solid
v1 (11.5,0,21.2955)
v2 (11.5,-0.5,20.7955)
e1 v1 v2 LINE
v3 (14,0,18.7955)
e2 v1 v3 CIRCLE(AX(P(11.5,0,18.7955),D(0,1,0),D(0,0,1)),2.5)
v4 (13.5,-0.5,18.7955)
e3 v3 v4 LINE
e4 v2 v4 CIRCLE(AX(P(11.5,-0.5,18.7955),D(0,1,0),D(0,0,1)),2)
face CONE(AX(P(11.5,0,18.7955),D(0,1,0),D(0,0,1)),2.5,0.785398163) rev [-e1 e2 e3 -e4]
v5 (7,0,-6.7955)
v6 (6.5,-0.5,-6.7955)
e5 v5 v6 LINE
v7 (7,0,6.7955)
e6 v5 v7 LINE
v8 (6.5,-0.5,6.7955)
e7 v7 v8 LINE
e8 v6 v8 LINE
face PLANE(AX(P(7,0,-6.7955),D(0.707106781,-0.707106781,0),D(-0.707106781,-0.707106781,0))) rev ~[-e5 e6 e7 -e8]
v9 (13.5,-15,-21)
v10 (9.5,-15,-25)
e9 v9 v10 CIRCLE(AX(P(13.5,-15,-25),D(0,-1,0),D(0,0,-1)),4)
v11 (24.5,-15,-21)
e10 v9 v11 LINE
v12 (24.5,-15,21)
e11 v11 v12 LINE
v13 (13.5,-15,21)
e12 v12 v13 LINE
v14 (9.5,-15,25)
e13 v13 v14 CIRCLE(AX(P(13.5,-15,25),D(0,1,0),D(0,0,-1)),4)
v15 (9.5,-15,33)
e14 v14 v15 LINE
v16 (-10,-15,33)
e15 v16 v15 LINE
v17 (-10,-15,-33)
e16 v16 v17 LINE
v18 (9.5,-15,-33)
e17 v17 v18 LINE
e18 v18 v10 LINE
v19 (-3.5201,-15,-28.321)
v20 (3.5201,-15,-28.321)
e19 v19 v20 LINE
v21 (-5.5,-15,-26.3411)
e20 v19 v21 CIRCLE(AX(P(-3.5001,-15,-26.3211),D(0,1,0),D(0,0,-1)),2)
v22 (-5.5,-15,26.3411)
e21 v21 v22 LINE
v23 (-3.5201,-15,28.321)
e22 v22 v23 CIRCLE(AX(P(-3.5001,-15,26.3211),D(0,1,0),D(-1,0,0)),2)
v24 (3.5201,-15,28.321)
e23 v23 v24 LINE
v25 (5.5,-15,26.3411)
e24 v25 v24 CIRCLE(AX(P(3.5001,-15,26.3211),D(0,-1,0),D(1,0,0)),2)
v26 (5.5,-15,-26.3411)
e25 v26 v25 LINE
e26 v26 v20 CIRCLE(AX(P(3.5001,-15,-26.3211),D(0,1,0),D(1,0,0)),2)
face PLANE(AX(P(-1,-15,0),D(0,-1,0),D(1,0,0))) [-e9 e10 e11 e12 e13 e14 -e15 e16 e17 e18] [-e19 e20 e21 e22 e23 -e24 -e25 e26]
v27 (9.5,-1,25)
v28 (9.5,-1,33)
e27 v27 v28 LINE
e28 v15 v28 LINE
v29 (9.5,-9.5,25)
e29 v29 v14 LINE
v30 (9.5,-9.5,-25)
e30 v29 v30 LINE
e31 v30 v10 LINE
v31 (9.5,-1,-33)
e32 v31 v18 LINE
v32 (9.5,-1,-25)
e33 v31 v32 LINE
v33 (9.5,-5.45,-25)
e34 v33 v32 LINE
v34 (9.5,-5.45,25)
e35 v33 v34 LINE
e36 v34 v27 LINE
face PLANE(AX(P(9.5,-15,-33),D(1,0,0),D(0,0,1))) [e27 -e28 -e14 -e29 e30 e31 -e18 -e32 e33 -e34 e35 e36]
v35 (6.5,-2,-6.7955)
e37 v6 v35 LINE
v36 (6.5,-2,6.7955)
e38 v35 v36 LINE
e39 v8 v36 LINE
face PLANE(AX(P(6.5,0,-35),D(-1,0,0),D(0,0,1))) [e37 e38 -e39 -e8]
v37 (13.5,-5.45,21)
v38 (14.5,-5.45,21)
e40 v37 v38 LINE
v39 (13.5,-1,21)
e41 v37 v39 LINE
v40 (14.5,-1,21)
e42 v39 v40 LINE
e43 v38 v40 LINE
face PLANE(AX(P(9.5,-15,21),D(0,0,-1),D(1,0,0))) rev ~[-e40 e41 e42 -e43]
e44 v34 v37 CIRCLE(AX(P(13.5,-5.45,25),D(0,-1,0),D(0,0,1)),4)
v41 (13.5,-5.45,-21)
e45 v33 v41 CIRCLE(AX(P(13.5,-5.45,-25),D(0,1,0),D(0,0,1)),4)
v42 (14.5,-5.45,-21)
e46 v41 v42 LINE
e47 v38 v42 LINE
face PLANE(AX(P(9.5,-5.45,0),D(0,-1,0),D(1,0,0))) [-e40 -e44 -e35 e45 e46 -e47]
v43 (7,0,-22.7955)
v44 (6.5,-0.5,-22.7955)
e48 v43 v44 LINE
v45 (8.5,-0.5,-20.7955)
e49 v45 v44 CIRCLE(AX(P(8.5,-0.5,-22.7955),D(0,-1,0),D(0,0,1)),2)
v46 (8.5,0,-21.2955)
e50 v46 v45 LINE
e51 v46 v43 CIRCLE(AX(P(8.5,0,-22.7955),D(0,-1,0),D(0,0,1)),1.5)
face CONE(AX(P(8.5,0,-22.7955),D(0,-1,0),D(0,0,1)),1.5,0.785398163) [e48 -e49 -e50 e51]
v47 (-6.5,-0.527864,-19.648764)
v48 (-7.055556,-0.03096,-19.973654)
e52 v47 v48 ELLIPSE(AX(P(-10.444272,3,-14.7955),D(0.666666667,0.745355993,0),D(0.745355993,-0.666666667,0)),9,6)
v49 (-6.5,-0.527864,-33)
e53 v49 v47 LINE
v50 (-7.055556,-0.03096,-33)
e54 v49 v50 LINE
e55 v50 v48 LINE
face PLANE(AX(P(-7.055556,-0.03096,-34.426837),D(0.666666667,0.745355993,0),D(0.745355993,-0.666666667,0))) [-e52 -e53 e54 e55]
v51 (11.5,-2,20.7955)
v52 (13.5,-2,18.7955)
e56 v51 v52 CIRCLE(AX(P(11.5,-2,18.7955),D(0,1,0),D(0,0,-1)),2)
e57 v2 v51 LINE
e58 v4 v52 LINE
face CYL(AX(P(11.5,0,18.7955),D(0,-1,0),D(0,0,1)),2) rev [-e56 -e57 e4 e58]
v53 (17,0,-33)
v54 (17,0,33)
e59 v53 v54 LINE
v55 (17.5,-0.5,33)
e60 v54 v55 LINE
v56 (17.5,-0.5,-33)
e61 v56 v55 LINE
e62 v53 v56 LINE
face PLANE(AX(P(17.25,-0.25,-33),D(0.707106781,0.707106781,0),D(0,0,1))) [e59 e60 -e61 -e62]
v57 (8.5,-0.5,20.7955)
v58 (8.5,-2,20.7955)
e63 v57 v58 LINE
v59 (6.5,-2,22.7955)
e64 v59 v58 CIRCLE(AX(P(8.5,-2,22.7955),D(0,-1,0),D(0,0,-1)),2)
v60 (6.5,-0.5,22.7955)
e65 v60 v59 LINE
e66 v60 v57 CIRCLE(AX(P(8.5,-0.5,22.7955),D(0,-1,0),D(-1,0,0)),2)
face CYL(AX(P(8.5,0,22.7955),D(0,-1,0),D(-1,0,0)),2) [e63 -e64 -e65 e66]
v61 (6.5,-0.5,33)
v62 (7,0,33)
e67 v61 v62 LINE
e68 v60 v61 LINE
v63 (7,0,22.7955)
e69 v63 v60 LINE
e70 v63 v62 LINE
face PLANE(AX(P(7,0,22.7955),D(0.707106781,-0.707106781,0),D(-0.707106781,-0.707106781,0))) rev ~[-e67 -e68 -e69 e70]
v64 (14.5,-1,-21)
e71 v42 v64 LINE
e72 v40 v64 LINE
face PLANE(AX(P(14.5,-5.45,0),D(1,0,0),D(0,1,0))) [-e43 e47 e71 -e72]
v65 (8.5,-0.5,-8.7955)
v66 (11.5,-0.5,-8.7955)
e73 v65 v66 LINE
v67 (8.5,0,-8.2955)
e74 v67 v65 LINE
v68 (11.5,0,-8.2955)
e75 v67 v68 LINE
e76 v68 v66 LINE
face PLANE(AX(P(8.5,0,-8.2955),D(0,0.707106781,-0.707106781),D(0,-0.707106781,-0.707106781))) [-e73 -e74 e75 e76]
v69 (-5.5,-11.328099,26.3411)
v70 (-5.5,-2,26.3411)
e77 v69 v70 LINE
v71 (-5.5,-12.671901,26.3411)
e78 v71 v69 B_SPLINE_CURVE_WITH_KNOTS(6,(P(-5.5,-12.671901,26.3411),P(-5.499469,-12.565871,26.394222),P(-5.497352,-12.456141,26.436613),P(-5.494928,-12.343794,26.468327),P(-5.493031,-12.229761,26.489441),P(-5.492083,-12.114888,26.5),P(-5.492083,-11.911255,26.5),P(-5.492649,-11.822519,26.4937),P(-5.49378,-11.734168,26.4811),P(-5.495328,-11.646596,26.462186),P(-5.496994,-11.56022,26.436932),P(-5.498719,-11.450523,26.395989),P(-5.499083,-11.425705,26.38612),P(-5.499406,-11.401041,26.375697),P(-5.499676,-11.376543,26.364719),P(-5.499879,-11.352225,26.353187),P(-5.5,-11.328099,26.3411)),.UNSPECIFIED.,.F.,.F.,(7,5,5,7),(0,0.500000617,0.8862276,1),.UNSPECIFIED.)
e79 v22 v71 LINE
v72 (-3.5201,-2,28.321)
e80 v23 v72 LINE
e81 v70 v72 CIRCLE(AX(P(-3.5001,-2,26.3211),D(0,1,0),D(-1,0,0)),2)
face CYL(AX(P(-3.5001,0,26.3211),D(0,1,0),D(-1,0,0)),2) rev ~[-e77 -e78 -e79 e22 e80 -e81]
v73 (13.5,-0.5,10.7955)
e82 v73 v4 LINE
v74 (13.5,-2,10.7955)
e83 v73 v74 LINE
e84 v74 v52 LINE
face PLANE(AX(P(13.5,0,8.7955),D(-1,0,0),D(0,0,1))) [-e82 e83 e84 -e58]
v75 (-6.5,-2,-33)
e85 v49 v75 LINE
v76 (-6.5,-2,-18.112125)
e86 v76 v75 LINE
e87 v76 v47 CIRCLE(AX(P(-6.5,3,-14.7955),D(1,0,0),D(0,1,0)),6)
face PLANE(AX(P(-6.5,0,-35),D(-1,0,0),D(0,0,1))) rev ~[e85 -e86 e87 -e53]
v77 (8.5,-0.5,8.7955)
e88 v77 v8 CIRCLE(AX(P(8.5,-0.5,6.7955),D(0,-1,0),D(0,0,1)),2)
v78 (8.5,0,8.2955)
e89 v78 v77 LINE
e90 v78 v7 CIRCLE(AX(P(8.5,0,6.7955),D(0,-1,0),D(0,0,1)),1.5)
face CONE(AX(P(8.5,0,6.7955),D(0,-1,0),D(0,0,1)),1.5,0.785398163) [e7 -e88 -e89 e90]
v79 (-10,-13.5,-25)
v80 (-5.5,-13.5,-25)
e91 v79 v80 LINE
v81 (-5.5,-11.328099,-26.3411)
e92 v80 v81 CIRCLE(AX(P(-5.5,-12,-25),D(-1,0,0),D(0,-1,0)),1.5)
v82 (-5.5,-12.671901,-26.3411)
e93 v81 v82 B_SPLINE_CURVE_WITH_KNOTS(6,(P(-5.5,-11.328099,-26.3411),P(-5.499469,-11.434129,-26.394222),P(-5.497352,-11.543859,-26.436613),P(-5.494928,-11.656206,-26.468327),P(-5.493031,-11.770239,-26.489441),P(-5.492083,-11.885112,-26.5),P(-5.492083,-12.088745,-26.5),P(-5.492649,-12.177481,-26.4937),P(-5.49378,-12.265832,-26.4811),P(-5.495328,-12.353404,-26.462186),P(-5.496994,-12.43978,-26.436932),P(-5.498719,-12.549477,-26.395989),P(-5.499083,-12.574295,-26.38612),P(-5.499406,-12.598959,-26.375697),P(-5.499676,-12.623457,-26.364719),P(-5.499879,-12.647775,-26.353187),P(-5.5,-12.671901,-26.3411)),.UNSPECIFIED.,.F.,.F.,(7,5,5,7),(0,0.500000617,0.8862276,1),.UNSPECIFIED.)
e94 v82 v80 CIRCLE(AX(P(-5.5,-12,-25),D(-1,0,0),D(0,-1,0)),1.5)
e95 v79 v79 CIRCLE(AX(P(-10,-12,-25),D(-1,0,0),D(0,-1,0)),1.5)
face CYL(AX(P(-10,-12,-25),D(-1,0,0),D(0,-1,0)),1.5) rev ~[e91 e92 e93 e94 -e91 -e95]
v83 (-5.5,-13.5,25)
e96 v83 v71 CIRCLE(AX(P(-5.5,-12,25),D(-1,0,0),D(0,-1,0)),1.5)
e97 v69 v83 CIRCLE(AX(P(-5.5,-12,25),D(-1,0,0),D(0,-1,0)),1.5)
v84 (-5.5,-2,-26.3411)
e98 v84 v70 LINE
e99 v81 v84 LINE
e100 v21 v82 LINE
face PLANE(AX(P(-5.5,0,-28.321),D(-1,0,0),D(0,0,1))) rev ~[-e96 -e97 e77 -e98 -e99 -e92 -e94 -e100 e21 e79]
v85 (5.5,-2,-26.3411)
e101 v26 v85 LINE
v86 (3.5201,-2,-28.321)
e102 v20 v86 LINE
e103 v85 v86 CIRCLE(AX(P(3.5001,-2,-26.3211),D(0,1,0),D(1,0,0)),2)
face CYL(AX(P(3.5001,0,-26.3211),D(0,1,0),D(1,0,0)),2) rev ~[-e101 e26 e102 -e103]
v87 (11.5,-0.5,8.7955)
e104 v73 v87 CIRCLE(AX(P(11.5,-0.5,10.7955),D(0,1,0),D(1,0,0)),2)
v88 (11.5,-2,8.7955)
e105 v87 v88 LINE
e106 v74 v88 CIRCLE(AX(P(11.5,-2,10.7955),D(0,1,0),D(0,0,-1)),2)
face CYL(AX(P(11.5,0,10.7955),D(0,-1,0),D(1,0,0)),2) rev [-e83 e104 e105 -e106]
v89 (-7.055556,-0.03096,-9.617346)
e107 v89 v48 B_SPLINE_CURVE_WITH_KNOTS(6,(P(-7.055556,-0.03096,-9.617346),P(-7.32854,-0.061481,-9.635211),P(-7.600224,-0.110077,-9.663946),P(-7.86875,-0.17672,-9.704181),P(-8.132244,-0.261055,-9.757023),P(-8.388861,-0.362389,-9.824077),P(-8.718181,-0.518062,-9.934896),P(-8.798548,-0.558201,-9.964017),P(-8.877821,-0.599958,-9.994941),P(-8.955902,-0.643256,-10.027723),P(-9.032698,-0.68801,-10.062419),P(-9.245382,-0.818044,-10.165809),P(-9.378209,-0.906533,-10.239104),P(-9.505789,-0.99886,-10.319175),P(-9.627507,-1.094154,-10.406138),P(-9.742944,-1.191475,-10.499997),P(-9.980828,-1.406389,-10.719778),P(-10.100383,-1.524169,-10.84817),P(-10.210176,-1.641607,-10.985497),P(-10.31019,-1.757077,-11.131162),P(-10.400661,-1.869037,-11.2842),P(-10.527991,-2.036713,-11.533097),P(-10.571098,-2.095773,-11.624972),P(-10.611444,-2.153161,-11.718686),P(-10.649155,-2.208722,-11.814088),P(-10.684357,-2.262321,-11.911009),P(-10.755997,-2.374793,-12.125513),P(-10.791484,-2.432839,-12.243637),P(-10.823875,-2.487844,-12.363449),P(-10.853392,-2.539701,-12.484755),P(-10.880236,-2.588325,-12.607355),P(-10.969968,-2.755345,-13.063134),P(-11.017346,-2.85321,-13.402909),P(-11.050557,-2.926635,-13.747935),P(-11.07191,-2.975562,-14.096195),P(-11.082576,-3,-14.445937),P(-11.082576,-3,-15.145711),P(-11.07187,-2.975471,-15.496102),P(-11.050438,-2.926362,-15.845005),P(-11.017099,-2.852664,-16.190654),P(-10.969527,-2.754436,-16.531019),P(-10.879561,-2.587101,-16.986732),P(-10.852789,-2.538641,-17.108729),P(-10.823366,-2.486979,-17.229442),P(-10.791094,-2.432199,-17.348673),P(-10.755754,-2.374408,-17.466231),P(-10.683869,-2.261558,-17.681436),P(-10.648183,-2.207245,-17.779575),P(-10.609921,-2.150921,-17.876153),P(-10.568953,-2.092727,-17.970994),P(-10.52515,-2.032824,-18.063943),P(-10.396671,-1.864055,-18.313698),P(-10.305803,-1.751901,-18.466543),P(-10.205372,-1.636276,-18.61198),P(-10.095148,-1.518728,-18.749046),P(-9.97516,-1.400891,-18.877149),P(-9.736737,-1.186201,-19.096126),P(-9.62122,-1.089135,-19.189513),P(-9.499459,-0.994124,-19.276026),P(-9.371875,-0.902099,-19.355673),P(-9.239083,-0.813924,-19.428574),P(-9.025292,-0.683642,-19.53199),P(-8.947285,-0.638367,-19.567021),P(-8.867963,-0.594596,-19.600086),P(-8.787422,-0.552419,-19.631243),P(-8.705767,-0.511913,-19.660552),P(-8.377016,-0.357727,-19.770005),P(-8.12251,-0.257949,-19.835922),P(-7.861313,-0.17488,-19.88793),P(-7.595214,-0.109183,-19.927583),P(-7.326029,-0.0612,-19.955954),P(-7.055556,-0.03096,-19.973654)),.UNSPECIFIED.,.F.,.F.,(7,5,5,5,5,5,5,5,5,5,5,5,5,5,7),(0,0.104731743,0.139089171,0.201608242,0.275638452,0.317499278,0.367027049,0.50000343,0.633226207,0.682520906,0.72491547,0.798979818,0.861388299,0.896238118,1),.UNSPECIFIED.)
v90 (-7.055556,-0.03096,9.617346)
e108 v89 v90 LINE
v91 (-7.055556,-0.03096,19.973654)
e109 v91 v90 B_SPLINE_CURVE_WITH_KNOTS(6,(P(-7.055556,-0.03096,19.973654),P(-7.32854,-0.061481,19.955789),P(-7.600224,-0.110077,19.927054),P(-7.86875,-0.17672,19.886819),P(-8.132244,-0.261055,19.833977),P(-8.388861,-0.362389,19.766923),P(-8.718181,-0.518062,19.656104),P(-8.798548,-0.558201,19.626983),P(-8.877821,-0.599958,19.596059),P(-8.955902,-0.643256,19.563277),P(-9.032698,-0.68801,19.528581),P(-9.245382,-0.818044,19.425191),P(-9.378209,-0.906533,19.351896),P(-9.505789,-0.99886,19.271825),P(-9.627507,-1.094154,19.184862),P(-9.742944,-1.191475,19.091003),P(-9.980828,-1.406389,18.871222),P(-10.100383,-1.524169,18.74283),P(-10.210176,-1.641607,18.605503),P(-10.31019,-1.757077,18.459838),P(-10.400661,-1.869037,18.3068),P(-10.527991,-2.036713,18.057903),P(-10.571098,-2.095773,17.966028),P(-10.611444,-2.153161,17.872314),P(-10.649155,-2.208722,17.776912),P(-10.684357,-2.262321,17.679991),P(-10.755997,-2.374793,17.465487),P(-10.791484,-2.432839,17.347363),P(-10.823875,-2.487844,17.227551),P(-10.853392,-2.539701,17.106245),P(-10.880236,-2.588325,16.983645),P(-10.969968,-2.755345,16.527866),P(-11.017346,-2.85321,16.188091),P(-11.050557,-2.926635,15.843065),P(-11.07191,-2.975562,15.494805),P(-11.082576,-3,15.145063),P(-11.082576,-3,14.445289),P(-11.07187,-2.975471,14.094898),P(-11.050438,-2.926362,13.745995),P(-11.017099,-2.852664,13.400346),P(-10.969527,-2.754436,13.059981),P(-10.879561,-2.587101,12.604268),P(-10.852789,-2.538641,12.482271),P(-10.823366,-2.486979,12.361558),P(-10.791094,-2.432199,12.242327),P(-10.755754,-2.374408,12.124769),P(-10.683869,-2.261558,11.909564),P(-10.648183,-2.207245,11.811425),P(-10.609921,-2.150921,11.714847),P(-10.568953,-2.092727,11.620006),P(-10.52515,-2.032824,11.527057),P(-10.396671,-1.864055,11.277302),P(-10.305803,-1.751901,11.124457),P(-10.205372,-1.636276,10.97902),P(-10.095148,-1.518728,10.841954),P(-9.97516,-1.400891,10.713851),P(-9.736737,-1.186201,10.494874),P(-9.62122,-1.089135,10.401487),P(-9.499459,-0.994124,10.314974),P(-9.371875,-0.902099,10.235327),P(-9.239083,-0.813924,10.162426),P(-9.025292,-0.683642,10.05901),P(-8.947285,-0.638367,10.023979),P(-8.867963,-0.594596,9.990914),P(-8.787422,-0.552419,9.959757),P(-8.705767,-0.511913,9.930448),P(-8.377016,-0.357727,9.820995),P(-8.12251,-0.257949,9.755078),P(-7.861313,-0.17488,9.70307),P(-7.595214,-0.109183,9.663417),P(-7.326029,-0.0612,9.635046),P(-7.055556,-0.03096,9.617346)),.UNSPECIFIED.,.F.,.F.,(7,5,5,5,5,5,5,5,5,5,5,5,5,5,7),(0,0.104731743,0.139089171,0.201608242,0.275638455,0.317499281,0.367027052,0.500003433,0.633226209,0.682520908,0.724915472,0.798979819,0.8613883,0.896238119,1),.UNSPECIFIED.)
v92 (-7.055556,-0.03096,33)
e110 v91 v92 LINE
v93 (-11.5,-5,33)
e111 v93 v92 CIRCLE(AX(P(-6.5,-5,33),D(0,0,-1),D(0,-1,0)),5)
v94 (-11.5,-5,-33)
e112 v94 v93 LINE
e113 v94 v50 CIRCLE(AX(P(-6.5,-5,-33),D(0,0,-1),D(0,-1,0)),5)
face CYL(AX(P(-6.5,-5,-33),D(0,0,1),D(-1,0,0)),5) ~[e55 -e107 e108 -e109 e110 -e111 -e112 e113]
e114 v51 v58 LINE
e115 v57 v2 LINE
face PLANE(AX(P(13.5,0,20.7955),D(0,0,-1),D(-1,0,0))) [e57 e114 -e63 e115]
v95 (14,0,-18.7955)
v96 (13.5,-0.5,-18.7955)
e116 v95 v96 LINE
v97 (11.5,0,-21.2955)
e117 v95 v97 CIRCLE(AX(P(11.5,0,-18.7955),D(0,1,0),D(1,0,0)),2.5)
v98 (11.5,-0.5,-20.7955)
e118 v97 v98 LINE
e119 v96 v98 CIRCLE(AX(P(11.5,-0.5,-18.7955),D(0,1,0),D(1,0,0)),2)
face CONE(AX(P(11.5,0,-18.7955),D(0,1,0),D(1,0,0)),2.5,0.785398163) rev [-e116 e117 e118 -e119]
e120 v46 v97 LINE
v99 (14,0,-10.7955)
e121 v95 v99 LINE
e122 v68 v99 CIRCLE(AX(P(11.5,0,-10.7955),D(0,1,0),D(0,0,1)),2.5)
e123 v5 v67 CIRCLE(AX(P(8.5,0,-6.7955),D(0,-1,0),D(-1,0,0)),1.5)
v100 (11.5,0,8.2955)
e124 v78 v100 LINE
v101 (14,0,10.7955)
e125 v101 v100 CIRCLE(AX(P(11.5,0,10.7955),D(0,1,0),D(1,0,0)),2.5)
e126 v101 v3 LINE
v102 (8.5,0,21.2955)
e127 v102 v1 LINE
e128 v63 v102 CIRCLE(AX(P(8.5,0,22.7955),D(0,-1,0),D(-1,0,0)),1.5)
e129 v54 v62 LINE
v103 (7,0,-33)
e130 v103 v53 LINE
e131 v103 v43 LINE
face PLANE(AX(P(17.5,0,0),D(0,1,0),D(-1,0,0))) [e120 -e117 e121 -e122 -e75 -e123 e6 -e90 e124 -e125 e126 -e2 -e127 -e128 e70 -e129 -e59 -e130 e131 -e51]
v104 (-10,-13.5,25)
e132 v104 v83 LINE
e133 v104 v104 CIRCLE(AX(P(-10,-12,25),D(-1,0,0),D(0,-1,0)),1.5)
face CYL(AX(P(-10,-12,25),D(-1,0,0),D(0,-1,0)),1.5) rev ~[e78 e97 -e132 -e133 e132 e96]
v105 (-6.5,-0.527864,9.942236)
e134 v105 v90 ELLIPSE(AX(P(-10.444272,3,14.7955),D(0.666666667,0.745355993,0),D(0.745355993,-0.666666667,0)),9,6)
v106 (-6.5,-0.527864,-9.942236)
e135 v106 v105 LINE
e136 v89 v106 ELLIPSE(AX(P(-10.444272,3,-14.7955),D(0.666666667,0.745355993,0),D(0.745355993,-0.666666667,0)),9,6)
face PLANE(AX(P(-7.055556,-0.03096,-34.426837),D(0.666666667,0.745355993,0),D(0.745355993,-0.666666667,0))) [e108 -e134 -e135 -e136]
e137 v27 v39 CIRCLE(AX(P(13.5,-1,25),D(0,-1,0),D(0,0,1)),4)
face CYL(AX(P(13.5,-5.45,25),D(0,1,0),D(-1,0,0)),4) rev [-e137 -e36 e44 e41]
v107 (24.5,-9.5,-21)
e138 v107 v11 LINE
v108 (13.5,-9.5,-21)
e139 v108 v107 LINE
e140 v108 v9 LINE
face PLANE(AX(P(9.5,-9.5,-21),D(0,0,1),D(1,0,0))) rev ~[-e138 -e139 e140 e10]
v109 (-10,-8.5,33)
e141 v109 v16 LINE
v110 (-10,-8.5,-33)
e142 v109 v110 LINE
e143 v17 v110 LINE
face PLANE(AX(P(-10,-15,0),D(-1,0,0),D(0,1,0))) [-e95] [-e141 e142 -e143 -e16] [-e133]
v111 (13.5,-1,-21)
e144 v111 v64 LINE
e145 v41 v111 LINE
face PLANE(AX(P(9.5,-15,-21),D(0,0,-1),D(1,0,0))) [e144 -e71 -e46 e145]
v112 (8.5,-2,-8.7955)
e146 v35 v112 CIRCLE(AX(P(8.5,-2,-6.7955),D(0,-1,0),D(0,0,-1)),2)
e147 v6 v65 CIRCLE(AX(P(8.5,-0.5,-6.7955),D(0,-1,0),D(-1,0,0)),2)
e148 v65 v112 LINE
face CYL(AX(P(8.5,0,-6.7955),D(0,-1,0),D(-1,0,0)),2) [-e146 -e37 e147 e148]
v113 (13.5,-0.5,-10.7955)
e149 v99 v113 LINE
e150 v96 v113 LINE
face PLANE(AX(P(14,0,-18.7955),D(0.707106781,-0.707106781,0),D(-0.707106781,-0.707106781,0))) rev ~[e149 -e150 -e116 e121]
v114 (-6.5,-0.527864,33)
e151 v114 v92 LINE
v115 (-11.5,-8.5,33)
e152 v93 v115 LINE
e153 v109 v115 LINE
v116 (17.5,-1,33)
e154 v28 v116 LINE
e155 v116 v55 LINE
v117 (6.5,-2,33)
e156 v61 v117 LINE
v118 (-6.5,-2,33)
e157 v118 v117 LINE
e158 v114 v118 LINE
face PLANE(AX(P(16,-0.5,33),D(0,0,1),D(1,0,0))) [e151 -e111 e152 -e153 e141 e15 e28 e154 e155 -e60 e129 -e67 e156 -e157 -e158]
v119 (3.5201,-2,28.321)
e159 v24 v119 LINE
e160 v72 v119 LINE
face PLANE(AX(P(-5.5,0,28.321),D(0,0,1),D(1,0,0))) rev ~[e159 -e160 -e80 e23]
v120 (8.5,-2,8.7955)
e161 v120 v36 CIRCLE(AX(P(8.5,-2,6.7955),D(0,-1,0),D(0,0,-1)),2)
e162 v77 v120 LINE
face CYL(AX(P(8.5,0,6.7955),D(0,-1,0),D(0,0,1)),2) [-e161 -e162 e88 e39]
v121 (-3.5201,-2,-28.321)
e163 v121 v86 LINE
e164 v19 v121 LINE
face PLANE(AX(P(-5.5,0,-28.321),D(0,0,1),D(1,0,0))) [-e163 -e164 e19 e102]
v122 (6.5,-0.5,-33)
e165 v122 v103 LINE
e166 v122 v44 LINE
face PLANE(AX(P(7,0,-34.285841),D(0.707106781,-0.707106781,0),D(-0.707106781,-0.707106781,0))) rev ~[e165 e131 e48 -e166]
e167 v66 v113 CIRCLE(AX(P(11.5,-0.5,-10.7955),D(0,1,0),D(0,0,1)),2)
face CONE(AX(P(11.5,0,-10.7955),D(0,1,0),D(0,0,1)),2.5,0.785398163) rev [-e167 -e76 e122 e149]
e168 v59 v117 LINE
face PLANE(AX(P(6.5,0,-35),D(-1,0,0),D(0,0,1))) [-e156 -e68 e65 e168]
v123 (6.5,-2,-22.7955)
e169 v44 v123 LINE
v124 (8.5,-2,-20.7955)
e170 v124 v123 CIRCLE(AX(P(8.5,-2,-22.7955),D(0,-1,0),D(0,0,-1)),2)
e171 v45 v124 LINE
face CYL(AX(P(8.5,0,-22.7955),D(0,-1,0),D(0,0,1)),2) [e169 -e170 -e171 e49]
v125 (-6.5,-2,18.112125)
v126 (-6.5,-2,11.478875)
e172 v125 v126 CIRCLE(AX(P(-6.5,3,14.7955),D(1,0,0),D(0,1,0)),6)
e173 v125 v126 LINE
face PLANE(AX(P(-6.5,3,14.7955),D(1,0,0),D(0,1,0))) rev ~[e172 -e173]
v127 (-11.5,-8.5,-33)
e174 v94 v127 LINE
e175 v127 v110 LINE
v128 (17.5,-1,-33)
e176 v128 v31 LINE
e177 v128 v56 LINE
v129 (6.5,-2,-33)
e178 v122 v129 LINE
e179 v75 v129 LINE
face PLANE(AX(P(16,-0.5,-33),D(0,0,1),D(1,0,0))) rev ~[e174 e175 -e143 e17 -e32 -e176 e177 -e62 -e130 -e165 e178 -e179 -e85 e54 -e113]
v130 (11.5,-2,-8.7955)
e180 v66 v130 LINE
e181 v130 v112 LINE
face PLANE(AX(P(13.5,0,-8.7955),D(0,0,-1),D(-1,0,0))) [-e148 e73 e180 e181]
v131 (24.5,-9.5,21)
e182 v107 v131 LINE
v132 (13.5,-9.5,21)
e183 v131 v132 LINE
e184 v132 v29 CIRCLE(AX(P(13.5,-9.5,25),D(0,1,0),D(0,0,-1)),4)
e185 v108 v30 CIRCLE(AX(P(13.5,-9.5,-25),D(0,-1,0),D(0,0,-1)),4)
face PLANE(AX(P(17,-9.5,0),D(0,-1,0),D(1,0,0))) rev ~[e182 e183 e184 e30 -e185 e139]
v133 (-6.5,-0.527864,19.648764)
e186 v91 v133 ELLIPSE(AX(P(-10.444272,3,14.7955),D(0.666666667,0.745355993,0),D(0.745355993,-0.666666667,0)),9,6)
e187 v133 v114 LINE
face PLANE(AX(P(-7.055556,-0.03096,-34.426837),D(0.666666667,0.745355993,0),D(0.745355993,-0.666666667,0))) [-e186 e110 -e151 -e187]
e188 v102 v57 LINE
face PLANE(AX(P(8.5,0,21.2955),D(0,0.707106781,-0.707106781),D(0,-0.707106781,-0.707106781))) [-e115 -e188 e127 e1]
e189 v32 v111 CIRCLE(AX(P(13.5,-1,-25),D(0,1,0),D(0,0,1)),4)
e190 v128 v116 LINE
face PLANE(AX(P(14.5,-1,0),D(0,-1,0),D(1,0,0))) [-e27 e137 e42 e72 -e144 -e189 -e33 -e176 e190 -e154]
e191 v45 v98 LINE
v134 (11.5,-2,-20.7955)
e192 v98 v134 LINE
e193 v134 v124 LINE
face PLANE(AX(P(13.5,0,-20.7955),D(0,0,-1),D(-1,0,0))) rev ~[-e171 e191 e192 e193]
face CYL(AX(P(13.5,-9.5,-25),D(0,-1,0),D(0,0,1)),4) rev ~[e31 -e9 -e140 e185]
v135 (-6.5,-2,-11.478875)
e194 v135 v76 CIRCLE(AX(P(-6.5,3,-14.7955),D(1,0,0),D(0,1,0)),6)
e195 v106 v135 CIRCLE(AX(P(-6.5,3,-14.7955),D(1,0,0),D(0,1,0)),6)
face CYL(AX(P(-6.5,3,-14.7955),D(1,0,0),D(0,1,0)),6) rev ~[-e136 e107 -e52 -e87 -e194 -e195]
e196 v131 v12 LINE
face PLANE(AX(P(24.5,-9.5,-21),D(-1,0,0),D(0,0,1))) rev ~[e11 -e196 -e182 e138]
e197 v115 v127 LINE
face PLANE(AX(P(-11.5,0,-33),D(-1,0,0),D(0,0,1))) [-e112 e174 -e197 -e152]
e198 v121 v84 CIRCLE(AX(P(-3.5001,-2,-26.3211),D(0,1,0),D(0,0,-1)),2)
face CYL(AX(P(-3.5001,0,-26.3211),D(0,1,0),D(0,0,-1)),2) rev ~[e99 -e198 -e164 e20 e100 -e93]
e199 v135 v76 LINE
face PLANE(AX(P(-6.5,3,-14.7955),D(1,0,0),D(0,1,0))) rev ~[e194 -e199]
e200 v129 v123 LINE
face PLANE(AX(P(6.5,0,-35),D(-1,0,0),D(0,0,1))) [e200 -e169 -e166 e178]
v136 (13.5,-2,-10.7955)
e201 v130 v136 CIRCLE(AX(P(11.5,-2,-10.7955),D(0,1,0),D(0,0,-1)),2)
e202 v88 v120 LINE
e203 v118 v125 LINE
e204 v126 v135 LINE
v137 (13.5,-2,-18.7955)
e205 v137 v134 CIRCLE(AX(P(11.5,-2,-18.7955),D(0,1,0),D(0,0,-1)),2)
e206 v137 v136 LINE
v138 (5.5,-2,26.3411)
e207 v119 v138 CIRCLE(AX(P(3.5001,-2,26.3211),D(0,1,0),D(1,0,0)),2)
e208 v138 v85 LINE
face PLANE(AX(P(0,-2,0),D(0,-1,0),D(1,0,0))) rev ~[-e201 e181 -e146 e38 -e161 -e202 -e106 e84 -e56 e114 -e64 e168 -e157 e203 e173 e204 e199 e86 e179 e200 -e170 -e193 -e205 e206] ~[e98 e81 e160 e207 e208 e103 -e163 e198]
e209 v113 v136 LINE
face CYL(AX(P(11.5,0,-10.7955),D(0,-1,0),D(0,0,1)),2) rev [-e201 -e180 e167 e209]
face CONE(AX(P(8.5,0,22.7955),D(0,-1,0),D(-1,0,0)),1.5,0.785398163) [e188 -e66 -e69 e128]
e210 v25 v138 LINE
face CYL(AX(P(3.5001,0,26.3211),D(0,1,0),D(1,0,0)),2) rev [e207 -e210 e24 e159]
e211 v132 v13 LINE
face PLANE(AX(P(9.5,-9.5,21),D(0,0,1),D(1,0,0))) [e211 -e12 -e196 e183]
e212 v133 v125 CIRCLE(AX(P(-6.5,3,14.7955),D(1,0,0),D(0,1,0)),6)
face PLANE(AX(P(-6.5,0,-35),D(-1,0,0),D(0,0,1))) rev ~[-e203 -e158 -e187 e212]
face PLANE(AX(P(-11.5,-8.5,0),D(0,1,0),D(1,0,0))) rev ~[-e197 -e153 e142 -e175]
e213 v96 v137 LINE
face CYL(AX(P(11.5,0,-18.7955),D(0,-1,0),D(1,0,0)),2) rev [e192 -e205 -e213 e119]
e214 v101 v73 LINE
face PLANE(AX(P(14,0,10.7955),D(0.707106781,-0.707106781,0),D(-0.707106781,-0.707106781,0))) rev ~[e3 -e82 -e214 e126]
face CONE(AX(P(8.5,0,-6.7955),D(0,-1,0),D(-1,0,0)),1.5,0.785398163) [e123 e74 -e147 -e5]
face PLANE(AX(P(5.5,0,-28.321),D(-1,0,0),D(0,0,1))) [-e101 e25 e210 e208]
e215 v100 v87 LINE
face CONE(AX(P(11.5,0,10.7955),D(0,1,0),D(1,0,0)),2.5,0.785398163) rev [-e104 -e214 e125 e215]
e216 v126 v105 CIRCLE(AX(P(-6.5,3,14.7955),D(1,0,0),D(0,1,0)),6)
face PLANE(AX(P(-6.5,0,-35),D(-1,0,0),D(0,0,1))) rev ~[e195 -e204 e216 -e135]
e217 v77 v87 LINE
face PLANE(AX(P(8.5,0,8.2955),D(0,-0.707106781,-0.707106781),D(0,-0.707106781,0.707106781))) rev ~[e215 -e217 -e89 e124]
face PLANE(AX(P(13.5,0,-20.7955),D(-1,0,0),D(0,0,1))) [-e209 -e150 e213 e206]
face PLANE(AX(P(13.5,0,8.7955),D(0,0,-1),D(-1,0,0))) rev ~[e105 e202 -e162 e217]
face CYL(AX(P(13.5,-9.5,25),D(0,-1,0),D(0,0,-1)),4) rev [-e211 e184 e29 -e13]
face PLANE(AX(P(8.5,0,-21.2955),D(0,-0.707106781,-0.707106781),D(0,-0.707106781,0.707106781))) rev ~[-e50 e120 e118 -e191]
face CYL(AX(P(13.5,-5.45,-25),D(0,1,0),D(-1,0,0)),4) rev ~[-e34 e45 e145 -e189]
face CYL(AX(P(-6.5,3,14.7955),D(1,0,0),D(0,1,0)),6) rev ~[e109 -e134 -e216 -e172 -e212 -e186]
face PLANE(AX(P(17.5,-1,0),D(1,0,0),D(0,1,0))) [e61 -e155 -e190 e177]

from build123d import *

# Parameters (mm, degrees)
F0_W           = 21
F0_H           = 66
F0_W_2         = 11
F0_H_2         = 56.642
F1_DEPTH       = 15
F2_R           = 5
F4_START       = 9.5
F3_W           = 15
F3_H           = 42
F4_DEPTH       = 5.5
F5_T1_DEPTH    = 15
F6_W           = 1.5
F6_H           = 6.5
F7_DEPTH       = 50
F7_DEPTH_BACK  = 50
F8_R           = 1.5
F9_DEPTH       = 5
F10_W          = 3
F10_H          = 1
F11_DEPTH      = 33
F11_DEPTH_BACK = 33
F12_SIZE       = 0.5
F13_W          = 5
F13_H          = 12
F14_DEPTH      = 14
F15_R          = 4
F16_W          = 13
F16_H          = 70
F17_DEPTH      = 2
F18_W          = 20
F18_H          = 12
F19_DEPTH      = 2
F20_R          = 2
F21_T1_DEPTH   = 68.8536746712
F21_T3_DEPTH   = 11.490341494
F21_T5_DEPTH   = 3
F21_T7_DEPTH   = 8
F21_T9_DEPTH   = 11.490341494
F21_T11_DEPTH  = 13.591
F21_T13_DEPTH  = 8
F21_T16_ANGLE  = 90
F21_T18_ANGLE  = 90
F21_T20_ANGLE  = 90
F21_T22_ANGLE  = 90
F21_T24_ANGLE  = 90
F21_T26_ANGLE  = 90
F21_T28_ANGLE  = 90
F21_T30_ANGLE  = 90
F23_START      = -6.5
F22_R          = 6
F23_DEPTH      = 5.001


# Not quite as in the source:
# - a fillet or chamfer that OpenCascade refuses, or shapes differently, is made with other operations: its cross-section is extruded or revolved along the edge and cut away or added


with BuildPart() as f1:
    # F0 (on Front) → F1 (new body)
    with BuildSketch(Plane.XZ):
        with Locations((-1, 0)):
            Rectangle(F0_W, F0_H)
        Rectangle(F0_W_2, F0_H_2, mode=Mode.SUBTRACT)
    extrude(amount=F1_DEPTH)

    # F2
    f2_edges = [f1.edges().sort_by_distance(p)[0] for p in [
        (-11.5, 0, 0),
    ]]
    fillet(f2_edges, radius=F2_R)

    # F3 (on Front) → F4 (join)
    with BuildSketch(Plane.XZ.offset(F4_START)):
        with Locations((17, 0)):
            Rectangle(F3_W, F3_H)
    extrude(amount=F4_DEPTH)

    # F5: fillet of radius 2 on 4 edges, made by hand

    # F5_s2 → F5_t1 (join)
    with BuildSketch(Plane.XZ):
        with BuildLine():
            ThreePointArc((5.5001, -26.3211), (4.9143135624, -27.7353135624), (3.5001, -28.3211))
            Line((3.5001, -28.3211), (3.5001, -28.3611))
            ThreePointArc((3.5001, -28.3611), (4.50005, -28.361), (5.5, -28.361))
            Line((5.5, -28.361), (5.54, -28.321))
            ThreePointArc((5.54, -28.321), (5.54, -27.32105), (5.5401, -26.3211))
            Line((5.5401, -26.3211), (5.5001, -26.3211))
        make_face()
        with BuildLine():
            ThreePointArc((-3.5001, -28.3211), (-4.9143135624, -27.7353135624), (-5.5001, -26.3211))
            Line((-5.5001, -26.3211), (-5.5401, -26.3211))
            ThreePointArc((-5.5401, -26.3211), (-5.54, -27.32105), (-5.54, -28.321))
            Line((-5.54, -28.321), (-5.5, -28.361))
            ThreePointArc((-5.5, -28.361), (-4.50005, -28.361), (-3.5001, -28.3611))
            Line((-3.5001, -28.3611), (-3.5001, -28.3211))
        make_face()
        with BuildLine():
            ThreePointArc((-5.5001, 26.3211), (-4.9143135624, 27.7353135624), (-3.5001, 28.3211))
            Line((-3.5001, 28.3211), (-3.5001, 28.3611))
            ThreePointArc((-3.5001, 28.3611), (-4.50005, 28.361), (-5.5, 28.361))
            Line((-5.5, 28.361), (-5.54, 28.321))
            ThreePointArc((-5.54, 28.321), (-5.54, 27.32105), (-5.5401, 26.3211))
            Line((-5.5401, 26.3211), (-5.5001, 26.3211))
        make_face()
        with BuildLine():
            ThreePointArc((5.5001, 26.3211), (4.9143135624, 27.7353135624), (3.5001, 28.3211))
            Line((3.5001, 28.3211), (3.5001, 28.3611))
            ThreePointArc((3.5001, 28.3611), (4.50005, 28.361), (5.5, 28.361))
            Line((5.5, 28.361), (5.54, 28.321))
            ThreePointArc((5.54, 28.321), (5.54, 27.32105), (5.5401, 26.3211))
            Line((5.5401, 26.3211), (5.5001, 26.3211))
        make_face()
    extrude(amount=F5_T1_DEPTH)

    # F6 (on Top) → F7 (cut, two sides)
    with BuildSketch(Plane.XY) as f7_sk:
        with Locations((-10.75, -11.75)):
            Rectangle(F6_W, F6_H)
    extrude(amount=-F7_DEPTH, mode=Mode.SUBTRACT)
    extrude(f7_sk.sketch, amount=F7_DEPTH_BACK, mode=Mode.SUBTRACT)

    # F8 (on face) → F9 (cut)
    with BuildSketch(Plane(origin=(-10, 0, 0), x_dir=(0, -1, 0), z_dir=(-1, 0, 0))):
        with Locations((12, 25)):
            Circle(F8_R)
        with Locations((12, -25)):
            Circle(F8_R)
    extrude(amount=-F9_DEPTH, mode=Mode.SUBTRACT)

    # F10 (on Top) → F11 (join, two sides)
    with BuildSketch(Plane.XY) as f11_sk:
        with Locations((16, -0.5)):
            Rectangle(F10_W, F10_H)
        Polygon((14.5, -5.45), (14.5, -1), (14.5, 0), (9.5, 0), (9.5, -5.45), align=None)
    extrude(amount=F11_DEPTH)
    extrude(f11_sk.sketch, amount=-F11_DEPTH_BACK)

    # F12
    f12_edges = [f1.edges().sort_by_distance(p)[0] for p in [
        (17.5, 0, 0),
    ]]
    chamfer(f12_edges, length=F12_SIZE)

    # F13 (on face) → F14 (cut)
    with BuildSketch(Plane.XZ.offset(15)):
        with Locations((12, -27)):
            Rectangle(F13_W, F13_H)
        with Locations((12, 27)):
            Rectangle(F13_W, F13_H)
    extrude(amount=-F14_DEPTH, mode=Mode.SUBTRACT)

    # F15
    f15_edges = [f1.edges().sort_by_distance(p)[0] for p in [
        (9.5, -3.225, -21),
        (9.5, -12.25, -21),
        (9.5, -3.225, 21),
        (9.5, -12.25, 21),
    ]]
    fillet(f15_edges, radius=F15_R)

    # F16 (on Front) → F17 (cut)
    with BuildSketch(Plane.XZ):
        Rectangle(F16_W, F16_H)
    extrude(amount=F17_DEPTH, mode=Mode.SUBTRACT)

    # F18 (on face) → F19 (cut)
    with BuildSketch(Plane(origin=(0, 0, 0), x_dir=(-1, 0, 0), z_dir=(0, 1, 0))):
        with Locations((-3.5, 14.7955)):
            Rectangle(F18_W, F18_H)
        with Locations((-3.5, -14.7955)):
            Rectangle(F18_W, F18_H)
    extrude(amount=-F19_DEPTH, mode=Mode.SUBTRACT)

    # F20
    f20_edges = [f1.edges().sort_by_distance(p)[0] for p in [
        (13.5, -1, -20.7955),
        (13.5, -1, 20.7955),
        (6.5, -1, 20.7955),
        (6.5, -1, 8.7955),
        (6.5, -1, -8.7955),
        (6.5, -1, -20.7955),
        (13.5, -1, -8.7955),
        (13.5, -1, 8.7955),
    ]]
    fillet(f20_edges, radius=F20_R)

    # F21: chamfer of 0.5 on 18 edges, made by hand

    # F21_s2 → F21_t1 (cut)
    with BuildSketch(Plane.XY.offset(-34.4268373356)):
        with BuildLine():
            Line((-7.0555555556, -0.03096005), (-6.5, -0.527864045))
            Line((-6.5, -0.527864045), (-6.5, 0))
            ThreePointArc((-6.5, 0), (-6.7852695606, -0.0081445055), (-7.0555555556, -0.03096005))
        make_face()
    extrude(amount=F21_T1_DEPTH, mode=Mode.SUBTRACT)

    # F21_s4 → F21_t3 (cut)
    with BuildSketch(Plane.XY.offset(-34.285841494)):
        Polygon((7, 0), (6.5, -0.5), (6.5, 0), align=None)
    extrude(amount=F21_T3_DEPTH, mode=Mode.SUBTRACT)

    # F21_s6 → F21_t5 (cut)
    with BuildSketch(Plane.YZ.offset(8.5)):
        Polygon((0, -21.2955), (-0.5, -20.7955), (0, -20.7955), align=None)
        Polygon((0, -8.2955), (-0.5, -8.7955), (0, -8.7955), align=None)
        Polygon((0, 21.2955), (-0.5, 20.7955), (0, 20.7955), align=None)
        Polygon((0, 8.2955), (-0.5, 8.7955), (0, 8.7955), align=None)
    extrude(amount=F21_T5_DEPTH, mode=Mode.SUBTRACT)

    # F21_s8 → F21_t7 (cut)
    with BuildSketch(Plane.XY.offset(-18.7955)):
        Polygon((14, 0), (13.5, -0.5), (13.5, 0), align=None)
    extrude(amount=F21_T7_DEPTH, mode=Mode.SUBTRACT)

    # F21_s10 → F21_t9 (cut)
    with BuildSketch(Plane.XY.offset(22.7955)):
        Polygon((7, 0), (6.5, -0.5), (6.5, 0), align=None)
    extrude(amount=F21_T9_DEPTH, mode=Mode.SUBTRACT)

    # F21_s12 → F21_t11 (cut)
    with BuildSketch(Plane.XY.offset(-6.7955)):
        Polygon((7, 0), (6.5, -0.5), (6.5, 0), align=None)
    extrude(amount=F21_T11_DEPTH, mode=Mode.SUBTRACT)

    # F21_s14 → F21_t13 (cut)
    with BuildSketch(Plane.XY.offset(10.7955)):
        Polygon((14, 0), (13.5, -0.5), (13.5, 0), align=None)
    extrude(amount=F21_T13_DEPTH, mode=Mode.SUBTRACT)

    # F21_s15 → F21_t16 (revolve, cut)
    with BuildSketch(Plane.YZ.offset(8.5)):
        Polygon((0, -21.2955), (-0.5, -20.7955), (0, -20.7955), align=None)
    revolve(axis=Axis((8.5, 0, -22.7955), (0, -1, 0)), revolution_arc=F21_T16_ANGLE, mode=Mode.SUBTRACT)

    # F21_s17 → F21_t18 (revolve, cut)
    with BuildSketch(Plane.XY.offset(-18.7955)):
        Polygon((14, 0), (13.5, -0.5), (13.5, 0), align=None)
    revolve(axis=Axis((11.5, 0, -18.7955), (0, 1, 0)), revolution_arc=F21_T18_ANGLE, mode=Mode.SUBTRACT)

    # F21_s19 → F21_t20 (revolve, cut)
    with BuildSketch(Plane.YZ.offset(11.5)):
        Polygon((0, -8.2955), (-0.5, -8.7955), (0, -8.7955), align=None)
    revolve(axis=Axis((11.5, 0, -10.7955), (0, 1, 0)), revolution_arc=F21_T20_ANGLE, mode=Mode.SUBTRACT)

    # F21_s21 → F21_t22 (revolve, cut)
    with BuildSketch(Plane.XY.offset(22.7955)):
        Polygon((7, 0), (6.5, -0.5), (6.5, 0), align=None)
    revolve(axis=Axis((8.5, 0, 22.7955), (0, -1, 0)), revolution_arc=F21_T22_ANGLE, mode=Mode.SUBTRACT)

    # F21_s23 → F21_t24 (revolve, cut)
    with BuildSketch(Plane.XY.offset(-6.7955)):
        Polygon((7, 0), (6.5, -0.5), (6.5, 0), align=None)
    revolve(axis=Axis((8.5, 0, -6.7955), (0, -1, 0)), revolution_arc=F21_T24_ANGLE, mode=Mode.SUBTRACT)

    # F21_s25 → F21_t26 (revolve, cut)
    with BuildSketch(Plane.YZ.offset(11.5)):
        Polygon((0, 21.2955), (-0.5, 20.7955), (0, 20.7955), align=None)
    revolve(axis=Axis((11.5, 0, 18.7955), (0, 1, 0)), revolution_arc=F21_T26_ANGLE, mode=Mode.SUBTRACT)

    # F21_s27 → F21_t28 (revolve, cut)
    with BuildSketch(Plane.YZ.offset(8.5)):
        Polygon((0, 8.2955), (-0.5, 8.7955), (0, 8.7955), align=None)
    revolve(axis=Axis((8.5, 0, 6.7955), (0, -1, 0)), revolution_arc=F21_T28_ANGLE, mode=Mode.SUBTRACT)

    # F21_s29 → F21_t30 (revolve, cut)
    with BuildSketch(Plane.XY.offset(10.7955)):
        Polygon((14, 0), (13.5, -0.5), (13.5, 0), align=None)
    revolve(axis=Axis((11.5, 0, 10.7955), (0, 1, 0)), revolution_arc=F21_T30_ANGLE, mode=Mode.SUBTRACT)

    # F22 (on Right) → F23 (cut)
    with BuildSketch(Plane.YZ.offset(F23_START)):
        with Locations((3, -14.7955)):
            Circle(F22_R)
        with Locations((3, 14.7955)):
            Circle(F22_R)
    extrude(amount=-F23_DEPTH, mode=Mode.SUBTRACT)


solid = f1.part
